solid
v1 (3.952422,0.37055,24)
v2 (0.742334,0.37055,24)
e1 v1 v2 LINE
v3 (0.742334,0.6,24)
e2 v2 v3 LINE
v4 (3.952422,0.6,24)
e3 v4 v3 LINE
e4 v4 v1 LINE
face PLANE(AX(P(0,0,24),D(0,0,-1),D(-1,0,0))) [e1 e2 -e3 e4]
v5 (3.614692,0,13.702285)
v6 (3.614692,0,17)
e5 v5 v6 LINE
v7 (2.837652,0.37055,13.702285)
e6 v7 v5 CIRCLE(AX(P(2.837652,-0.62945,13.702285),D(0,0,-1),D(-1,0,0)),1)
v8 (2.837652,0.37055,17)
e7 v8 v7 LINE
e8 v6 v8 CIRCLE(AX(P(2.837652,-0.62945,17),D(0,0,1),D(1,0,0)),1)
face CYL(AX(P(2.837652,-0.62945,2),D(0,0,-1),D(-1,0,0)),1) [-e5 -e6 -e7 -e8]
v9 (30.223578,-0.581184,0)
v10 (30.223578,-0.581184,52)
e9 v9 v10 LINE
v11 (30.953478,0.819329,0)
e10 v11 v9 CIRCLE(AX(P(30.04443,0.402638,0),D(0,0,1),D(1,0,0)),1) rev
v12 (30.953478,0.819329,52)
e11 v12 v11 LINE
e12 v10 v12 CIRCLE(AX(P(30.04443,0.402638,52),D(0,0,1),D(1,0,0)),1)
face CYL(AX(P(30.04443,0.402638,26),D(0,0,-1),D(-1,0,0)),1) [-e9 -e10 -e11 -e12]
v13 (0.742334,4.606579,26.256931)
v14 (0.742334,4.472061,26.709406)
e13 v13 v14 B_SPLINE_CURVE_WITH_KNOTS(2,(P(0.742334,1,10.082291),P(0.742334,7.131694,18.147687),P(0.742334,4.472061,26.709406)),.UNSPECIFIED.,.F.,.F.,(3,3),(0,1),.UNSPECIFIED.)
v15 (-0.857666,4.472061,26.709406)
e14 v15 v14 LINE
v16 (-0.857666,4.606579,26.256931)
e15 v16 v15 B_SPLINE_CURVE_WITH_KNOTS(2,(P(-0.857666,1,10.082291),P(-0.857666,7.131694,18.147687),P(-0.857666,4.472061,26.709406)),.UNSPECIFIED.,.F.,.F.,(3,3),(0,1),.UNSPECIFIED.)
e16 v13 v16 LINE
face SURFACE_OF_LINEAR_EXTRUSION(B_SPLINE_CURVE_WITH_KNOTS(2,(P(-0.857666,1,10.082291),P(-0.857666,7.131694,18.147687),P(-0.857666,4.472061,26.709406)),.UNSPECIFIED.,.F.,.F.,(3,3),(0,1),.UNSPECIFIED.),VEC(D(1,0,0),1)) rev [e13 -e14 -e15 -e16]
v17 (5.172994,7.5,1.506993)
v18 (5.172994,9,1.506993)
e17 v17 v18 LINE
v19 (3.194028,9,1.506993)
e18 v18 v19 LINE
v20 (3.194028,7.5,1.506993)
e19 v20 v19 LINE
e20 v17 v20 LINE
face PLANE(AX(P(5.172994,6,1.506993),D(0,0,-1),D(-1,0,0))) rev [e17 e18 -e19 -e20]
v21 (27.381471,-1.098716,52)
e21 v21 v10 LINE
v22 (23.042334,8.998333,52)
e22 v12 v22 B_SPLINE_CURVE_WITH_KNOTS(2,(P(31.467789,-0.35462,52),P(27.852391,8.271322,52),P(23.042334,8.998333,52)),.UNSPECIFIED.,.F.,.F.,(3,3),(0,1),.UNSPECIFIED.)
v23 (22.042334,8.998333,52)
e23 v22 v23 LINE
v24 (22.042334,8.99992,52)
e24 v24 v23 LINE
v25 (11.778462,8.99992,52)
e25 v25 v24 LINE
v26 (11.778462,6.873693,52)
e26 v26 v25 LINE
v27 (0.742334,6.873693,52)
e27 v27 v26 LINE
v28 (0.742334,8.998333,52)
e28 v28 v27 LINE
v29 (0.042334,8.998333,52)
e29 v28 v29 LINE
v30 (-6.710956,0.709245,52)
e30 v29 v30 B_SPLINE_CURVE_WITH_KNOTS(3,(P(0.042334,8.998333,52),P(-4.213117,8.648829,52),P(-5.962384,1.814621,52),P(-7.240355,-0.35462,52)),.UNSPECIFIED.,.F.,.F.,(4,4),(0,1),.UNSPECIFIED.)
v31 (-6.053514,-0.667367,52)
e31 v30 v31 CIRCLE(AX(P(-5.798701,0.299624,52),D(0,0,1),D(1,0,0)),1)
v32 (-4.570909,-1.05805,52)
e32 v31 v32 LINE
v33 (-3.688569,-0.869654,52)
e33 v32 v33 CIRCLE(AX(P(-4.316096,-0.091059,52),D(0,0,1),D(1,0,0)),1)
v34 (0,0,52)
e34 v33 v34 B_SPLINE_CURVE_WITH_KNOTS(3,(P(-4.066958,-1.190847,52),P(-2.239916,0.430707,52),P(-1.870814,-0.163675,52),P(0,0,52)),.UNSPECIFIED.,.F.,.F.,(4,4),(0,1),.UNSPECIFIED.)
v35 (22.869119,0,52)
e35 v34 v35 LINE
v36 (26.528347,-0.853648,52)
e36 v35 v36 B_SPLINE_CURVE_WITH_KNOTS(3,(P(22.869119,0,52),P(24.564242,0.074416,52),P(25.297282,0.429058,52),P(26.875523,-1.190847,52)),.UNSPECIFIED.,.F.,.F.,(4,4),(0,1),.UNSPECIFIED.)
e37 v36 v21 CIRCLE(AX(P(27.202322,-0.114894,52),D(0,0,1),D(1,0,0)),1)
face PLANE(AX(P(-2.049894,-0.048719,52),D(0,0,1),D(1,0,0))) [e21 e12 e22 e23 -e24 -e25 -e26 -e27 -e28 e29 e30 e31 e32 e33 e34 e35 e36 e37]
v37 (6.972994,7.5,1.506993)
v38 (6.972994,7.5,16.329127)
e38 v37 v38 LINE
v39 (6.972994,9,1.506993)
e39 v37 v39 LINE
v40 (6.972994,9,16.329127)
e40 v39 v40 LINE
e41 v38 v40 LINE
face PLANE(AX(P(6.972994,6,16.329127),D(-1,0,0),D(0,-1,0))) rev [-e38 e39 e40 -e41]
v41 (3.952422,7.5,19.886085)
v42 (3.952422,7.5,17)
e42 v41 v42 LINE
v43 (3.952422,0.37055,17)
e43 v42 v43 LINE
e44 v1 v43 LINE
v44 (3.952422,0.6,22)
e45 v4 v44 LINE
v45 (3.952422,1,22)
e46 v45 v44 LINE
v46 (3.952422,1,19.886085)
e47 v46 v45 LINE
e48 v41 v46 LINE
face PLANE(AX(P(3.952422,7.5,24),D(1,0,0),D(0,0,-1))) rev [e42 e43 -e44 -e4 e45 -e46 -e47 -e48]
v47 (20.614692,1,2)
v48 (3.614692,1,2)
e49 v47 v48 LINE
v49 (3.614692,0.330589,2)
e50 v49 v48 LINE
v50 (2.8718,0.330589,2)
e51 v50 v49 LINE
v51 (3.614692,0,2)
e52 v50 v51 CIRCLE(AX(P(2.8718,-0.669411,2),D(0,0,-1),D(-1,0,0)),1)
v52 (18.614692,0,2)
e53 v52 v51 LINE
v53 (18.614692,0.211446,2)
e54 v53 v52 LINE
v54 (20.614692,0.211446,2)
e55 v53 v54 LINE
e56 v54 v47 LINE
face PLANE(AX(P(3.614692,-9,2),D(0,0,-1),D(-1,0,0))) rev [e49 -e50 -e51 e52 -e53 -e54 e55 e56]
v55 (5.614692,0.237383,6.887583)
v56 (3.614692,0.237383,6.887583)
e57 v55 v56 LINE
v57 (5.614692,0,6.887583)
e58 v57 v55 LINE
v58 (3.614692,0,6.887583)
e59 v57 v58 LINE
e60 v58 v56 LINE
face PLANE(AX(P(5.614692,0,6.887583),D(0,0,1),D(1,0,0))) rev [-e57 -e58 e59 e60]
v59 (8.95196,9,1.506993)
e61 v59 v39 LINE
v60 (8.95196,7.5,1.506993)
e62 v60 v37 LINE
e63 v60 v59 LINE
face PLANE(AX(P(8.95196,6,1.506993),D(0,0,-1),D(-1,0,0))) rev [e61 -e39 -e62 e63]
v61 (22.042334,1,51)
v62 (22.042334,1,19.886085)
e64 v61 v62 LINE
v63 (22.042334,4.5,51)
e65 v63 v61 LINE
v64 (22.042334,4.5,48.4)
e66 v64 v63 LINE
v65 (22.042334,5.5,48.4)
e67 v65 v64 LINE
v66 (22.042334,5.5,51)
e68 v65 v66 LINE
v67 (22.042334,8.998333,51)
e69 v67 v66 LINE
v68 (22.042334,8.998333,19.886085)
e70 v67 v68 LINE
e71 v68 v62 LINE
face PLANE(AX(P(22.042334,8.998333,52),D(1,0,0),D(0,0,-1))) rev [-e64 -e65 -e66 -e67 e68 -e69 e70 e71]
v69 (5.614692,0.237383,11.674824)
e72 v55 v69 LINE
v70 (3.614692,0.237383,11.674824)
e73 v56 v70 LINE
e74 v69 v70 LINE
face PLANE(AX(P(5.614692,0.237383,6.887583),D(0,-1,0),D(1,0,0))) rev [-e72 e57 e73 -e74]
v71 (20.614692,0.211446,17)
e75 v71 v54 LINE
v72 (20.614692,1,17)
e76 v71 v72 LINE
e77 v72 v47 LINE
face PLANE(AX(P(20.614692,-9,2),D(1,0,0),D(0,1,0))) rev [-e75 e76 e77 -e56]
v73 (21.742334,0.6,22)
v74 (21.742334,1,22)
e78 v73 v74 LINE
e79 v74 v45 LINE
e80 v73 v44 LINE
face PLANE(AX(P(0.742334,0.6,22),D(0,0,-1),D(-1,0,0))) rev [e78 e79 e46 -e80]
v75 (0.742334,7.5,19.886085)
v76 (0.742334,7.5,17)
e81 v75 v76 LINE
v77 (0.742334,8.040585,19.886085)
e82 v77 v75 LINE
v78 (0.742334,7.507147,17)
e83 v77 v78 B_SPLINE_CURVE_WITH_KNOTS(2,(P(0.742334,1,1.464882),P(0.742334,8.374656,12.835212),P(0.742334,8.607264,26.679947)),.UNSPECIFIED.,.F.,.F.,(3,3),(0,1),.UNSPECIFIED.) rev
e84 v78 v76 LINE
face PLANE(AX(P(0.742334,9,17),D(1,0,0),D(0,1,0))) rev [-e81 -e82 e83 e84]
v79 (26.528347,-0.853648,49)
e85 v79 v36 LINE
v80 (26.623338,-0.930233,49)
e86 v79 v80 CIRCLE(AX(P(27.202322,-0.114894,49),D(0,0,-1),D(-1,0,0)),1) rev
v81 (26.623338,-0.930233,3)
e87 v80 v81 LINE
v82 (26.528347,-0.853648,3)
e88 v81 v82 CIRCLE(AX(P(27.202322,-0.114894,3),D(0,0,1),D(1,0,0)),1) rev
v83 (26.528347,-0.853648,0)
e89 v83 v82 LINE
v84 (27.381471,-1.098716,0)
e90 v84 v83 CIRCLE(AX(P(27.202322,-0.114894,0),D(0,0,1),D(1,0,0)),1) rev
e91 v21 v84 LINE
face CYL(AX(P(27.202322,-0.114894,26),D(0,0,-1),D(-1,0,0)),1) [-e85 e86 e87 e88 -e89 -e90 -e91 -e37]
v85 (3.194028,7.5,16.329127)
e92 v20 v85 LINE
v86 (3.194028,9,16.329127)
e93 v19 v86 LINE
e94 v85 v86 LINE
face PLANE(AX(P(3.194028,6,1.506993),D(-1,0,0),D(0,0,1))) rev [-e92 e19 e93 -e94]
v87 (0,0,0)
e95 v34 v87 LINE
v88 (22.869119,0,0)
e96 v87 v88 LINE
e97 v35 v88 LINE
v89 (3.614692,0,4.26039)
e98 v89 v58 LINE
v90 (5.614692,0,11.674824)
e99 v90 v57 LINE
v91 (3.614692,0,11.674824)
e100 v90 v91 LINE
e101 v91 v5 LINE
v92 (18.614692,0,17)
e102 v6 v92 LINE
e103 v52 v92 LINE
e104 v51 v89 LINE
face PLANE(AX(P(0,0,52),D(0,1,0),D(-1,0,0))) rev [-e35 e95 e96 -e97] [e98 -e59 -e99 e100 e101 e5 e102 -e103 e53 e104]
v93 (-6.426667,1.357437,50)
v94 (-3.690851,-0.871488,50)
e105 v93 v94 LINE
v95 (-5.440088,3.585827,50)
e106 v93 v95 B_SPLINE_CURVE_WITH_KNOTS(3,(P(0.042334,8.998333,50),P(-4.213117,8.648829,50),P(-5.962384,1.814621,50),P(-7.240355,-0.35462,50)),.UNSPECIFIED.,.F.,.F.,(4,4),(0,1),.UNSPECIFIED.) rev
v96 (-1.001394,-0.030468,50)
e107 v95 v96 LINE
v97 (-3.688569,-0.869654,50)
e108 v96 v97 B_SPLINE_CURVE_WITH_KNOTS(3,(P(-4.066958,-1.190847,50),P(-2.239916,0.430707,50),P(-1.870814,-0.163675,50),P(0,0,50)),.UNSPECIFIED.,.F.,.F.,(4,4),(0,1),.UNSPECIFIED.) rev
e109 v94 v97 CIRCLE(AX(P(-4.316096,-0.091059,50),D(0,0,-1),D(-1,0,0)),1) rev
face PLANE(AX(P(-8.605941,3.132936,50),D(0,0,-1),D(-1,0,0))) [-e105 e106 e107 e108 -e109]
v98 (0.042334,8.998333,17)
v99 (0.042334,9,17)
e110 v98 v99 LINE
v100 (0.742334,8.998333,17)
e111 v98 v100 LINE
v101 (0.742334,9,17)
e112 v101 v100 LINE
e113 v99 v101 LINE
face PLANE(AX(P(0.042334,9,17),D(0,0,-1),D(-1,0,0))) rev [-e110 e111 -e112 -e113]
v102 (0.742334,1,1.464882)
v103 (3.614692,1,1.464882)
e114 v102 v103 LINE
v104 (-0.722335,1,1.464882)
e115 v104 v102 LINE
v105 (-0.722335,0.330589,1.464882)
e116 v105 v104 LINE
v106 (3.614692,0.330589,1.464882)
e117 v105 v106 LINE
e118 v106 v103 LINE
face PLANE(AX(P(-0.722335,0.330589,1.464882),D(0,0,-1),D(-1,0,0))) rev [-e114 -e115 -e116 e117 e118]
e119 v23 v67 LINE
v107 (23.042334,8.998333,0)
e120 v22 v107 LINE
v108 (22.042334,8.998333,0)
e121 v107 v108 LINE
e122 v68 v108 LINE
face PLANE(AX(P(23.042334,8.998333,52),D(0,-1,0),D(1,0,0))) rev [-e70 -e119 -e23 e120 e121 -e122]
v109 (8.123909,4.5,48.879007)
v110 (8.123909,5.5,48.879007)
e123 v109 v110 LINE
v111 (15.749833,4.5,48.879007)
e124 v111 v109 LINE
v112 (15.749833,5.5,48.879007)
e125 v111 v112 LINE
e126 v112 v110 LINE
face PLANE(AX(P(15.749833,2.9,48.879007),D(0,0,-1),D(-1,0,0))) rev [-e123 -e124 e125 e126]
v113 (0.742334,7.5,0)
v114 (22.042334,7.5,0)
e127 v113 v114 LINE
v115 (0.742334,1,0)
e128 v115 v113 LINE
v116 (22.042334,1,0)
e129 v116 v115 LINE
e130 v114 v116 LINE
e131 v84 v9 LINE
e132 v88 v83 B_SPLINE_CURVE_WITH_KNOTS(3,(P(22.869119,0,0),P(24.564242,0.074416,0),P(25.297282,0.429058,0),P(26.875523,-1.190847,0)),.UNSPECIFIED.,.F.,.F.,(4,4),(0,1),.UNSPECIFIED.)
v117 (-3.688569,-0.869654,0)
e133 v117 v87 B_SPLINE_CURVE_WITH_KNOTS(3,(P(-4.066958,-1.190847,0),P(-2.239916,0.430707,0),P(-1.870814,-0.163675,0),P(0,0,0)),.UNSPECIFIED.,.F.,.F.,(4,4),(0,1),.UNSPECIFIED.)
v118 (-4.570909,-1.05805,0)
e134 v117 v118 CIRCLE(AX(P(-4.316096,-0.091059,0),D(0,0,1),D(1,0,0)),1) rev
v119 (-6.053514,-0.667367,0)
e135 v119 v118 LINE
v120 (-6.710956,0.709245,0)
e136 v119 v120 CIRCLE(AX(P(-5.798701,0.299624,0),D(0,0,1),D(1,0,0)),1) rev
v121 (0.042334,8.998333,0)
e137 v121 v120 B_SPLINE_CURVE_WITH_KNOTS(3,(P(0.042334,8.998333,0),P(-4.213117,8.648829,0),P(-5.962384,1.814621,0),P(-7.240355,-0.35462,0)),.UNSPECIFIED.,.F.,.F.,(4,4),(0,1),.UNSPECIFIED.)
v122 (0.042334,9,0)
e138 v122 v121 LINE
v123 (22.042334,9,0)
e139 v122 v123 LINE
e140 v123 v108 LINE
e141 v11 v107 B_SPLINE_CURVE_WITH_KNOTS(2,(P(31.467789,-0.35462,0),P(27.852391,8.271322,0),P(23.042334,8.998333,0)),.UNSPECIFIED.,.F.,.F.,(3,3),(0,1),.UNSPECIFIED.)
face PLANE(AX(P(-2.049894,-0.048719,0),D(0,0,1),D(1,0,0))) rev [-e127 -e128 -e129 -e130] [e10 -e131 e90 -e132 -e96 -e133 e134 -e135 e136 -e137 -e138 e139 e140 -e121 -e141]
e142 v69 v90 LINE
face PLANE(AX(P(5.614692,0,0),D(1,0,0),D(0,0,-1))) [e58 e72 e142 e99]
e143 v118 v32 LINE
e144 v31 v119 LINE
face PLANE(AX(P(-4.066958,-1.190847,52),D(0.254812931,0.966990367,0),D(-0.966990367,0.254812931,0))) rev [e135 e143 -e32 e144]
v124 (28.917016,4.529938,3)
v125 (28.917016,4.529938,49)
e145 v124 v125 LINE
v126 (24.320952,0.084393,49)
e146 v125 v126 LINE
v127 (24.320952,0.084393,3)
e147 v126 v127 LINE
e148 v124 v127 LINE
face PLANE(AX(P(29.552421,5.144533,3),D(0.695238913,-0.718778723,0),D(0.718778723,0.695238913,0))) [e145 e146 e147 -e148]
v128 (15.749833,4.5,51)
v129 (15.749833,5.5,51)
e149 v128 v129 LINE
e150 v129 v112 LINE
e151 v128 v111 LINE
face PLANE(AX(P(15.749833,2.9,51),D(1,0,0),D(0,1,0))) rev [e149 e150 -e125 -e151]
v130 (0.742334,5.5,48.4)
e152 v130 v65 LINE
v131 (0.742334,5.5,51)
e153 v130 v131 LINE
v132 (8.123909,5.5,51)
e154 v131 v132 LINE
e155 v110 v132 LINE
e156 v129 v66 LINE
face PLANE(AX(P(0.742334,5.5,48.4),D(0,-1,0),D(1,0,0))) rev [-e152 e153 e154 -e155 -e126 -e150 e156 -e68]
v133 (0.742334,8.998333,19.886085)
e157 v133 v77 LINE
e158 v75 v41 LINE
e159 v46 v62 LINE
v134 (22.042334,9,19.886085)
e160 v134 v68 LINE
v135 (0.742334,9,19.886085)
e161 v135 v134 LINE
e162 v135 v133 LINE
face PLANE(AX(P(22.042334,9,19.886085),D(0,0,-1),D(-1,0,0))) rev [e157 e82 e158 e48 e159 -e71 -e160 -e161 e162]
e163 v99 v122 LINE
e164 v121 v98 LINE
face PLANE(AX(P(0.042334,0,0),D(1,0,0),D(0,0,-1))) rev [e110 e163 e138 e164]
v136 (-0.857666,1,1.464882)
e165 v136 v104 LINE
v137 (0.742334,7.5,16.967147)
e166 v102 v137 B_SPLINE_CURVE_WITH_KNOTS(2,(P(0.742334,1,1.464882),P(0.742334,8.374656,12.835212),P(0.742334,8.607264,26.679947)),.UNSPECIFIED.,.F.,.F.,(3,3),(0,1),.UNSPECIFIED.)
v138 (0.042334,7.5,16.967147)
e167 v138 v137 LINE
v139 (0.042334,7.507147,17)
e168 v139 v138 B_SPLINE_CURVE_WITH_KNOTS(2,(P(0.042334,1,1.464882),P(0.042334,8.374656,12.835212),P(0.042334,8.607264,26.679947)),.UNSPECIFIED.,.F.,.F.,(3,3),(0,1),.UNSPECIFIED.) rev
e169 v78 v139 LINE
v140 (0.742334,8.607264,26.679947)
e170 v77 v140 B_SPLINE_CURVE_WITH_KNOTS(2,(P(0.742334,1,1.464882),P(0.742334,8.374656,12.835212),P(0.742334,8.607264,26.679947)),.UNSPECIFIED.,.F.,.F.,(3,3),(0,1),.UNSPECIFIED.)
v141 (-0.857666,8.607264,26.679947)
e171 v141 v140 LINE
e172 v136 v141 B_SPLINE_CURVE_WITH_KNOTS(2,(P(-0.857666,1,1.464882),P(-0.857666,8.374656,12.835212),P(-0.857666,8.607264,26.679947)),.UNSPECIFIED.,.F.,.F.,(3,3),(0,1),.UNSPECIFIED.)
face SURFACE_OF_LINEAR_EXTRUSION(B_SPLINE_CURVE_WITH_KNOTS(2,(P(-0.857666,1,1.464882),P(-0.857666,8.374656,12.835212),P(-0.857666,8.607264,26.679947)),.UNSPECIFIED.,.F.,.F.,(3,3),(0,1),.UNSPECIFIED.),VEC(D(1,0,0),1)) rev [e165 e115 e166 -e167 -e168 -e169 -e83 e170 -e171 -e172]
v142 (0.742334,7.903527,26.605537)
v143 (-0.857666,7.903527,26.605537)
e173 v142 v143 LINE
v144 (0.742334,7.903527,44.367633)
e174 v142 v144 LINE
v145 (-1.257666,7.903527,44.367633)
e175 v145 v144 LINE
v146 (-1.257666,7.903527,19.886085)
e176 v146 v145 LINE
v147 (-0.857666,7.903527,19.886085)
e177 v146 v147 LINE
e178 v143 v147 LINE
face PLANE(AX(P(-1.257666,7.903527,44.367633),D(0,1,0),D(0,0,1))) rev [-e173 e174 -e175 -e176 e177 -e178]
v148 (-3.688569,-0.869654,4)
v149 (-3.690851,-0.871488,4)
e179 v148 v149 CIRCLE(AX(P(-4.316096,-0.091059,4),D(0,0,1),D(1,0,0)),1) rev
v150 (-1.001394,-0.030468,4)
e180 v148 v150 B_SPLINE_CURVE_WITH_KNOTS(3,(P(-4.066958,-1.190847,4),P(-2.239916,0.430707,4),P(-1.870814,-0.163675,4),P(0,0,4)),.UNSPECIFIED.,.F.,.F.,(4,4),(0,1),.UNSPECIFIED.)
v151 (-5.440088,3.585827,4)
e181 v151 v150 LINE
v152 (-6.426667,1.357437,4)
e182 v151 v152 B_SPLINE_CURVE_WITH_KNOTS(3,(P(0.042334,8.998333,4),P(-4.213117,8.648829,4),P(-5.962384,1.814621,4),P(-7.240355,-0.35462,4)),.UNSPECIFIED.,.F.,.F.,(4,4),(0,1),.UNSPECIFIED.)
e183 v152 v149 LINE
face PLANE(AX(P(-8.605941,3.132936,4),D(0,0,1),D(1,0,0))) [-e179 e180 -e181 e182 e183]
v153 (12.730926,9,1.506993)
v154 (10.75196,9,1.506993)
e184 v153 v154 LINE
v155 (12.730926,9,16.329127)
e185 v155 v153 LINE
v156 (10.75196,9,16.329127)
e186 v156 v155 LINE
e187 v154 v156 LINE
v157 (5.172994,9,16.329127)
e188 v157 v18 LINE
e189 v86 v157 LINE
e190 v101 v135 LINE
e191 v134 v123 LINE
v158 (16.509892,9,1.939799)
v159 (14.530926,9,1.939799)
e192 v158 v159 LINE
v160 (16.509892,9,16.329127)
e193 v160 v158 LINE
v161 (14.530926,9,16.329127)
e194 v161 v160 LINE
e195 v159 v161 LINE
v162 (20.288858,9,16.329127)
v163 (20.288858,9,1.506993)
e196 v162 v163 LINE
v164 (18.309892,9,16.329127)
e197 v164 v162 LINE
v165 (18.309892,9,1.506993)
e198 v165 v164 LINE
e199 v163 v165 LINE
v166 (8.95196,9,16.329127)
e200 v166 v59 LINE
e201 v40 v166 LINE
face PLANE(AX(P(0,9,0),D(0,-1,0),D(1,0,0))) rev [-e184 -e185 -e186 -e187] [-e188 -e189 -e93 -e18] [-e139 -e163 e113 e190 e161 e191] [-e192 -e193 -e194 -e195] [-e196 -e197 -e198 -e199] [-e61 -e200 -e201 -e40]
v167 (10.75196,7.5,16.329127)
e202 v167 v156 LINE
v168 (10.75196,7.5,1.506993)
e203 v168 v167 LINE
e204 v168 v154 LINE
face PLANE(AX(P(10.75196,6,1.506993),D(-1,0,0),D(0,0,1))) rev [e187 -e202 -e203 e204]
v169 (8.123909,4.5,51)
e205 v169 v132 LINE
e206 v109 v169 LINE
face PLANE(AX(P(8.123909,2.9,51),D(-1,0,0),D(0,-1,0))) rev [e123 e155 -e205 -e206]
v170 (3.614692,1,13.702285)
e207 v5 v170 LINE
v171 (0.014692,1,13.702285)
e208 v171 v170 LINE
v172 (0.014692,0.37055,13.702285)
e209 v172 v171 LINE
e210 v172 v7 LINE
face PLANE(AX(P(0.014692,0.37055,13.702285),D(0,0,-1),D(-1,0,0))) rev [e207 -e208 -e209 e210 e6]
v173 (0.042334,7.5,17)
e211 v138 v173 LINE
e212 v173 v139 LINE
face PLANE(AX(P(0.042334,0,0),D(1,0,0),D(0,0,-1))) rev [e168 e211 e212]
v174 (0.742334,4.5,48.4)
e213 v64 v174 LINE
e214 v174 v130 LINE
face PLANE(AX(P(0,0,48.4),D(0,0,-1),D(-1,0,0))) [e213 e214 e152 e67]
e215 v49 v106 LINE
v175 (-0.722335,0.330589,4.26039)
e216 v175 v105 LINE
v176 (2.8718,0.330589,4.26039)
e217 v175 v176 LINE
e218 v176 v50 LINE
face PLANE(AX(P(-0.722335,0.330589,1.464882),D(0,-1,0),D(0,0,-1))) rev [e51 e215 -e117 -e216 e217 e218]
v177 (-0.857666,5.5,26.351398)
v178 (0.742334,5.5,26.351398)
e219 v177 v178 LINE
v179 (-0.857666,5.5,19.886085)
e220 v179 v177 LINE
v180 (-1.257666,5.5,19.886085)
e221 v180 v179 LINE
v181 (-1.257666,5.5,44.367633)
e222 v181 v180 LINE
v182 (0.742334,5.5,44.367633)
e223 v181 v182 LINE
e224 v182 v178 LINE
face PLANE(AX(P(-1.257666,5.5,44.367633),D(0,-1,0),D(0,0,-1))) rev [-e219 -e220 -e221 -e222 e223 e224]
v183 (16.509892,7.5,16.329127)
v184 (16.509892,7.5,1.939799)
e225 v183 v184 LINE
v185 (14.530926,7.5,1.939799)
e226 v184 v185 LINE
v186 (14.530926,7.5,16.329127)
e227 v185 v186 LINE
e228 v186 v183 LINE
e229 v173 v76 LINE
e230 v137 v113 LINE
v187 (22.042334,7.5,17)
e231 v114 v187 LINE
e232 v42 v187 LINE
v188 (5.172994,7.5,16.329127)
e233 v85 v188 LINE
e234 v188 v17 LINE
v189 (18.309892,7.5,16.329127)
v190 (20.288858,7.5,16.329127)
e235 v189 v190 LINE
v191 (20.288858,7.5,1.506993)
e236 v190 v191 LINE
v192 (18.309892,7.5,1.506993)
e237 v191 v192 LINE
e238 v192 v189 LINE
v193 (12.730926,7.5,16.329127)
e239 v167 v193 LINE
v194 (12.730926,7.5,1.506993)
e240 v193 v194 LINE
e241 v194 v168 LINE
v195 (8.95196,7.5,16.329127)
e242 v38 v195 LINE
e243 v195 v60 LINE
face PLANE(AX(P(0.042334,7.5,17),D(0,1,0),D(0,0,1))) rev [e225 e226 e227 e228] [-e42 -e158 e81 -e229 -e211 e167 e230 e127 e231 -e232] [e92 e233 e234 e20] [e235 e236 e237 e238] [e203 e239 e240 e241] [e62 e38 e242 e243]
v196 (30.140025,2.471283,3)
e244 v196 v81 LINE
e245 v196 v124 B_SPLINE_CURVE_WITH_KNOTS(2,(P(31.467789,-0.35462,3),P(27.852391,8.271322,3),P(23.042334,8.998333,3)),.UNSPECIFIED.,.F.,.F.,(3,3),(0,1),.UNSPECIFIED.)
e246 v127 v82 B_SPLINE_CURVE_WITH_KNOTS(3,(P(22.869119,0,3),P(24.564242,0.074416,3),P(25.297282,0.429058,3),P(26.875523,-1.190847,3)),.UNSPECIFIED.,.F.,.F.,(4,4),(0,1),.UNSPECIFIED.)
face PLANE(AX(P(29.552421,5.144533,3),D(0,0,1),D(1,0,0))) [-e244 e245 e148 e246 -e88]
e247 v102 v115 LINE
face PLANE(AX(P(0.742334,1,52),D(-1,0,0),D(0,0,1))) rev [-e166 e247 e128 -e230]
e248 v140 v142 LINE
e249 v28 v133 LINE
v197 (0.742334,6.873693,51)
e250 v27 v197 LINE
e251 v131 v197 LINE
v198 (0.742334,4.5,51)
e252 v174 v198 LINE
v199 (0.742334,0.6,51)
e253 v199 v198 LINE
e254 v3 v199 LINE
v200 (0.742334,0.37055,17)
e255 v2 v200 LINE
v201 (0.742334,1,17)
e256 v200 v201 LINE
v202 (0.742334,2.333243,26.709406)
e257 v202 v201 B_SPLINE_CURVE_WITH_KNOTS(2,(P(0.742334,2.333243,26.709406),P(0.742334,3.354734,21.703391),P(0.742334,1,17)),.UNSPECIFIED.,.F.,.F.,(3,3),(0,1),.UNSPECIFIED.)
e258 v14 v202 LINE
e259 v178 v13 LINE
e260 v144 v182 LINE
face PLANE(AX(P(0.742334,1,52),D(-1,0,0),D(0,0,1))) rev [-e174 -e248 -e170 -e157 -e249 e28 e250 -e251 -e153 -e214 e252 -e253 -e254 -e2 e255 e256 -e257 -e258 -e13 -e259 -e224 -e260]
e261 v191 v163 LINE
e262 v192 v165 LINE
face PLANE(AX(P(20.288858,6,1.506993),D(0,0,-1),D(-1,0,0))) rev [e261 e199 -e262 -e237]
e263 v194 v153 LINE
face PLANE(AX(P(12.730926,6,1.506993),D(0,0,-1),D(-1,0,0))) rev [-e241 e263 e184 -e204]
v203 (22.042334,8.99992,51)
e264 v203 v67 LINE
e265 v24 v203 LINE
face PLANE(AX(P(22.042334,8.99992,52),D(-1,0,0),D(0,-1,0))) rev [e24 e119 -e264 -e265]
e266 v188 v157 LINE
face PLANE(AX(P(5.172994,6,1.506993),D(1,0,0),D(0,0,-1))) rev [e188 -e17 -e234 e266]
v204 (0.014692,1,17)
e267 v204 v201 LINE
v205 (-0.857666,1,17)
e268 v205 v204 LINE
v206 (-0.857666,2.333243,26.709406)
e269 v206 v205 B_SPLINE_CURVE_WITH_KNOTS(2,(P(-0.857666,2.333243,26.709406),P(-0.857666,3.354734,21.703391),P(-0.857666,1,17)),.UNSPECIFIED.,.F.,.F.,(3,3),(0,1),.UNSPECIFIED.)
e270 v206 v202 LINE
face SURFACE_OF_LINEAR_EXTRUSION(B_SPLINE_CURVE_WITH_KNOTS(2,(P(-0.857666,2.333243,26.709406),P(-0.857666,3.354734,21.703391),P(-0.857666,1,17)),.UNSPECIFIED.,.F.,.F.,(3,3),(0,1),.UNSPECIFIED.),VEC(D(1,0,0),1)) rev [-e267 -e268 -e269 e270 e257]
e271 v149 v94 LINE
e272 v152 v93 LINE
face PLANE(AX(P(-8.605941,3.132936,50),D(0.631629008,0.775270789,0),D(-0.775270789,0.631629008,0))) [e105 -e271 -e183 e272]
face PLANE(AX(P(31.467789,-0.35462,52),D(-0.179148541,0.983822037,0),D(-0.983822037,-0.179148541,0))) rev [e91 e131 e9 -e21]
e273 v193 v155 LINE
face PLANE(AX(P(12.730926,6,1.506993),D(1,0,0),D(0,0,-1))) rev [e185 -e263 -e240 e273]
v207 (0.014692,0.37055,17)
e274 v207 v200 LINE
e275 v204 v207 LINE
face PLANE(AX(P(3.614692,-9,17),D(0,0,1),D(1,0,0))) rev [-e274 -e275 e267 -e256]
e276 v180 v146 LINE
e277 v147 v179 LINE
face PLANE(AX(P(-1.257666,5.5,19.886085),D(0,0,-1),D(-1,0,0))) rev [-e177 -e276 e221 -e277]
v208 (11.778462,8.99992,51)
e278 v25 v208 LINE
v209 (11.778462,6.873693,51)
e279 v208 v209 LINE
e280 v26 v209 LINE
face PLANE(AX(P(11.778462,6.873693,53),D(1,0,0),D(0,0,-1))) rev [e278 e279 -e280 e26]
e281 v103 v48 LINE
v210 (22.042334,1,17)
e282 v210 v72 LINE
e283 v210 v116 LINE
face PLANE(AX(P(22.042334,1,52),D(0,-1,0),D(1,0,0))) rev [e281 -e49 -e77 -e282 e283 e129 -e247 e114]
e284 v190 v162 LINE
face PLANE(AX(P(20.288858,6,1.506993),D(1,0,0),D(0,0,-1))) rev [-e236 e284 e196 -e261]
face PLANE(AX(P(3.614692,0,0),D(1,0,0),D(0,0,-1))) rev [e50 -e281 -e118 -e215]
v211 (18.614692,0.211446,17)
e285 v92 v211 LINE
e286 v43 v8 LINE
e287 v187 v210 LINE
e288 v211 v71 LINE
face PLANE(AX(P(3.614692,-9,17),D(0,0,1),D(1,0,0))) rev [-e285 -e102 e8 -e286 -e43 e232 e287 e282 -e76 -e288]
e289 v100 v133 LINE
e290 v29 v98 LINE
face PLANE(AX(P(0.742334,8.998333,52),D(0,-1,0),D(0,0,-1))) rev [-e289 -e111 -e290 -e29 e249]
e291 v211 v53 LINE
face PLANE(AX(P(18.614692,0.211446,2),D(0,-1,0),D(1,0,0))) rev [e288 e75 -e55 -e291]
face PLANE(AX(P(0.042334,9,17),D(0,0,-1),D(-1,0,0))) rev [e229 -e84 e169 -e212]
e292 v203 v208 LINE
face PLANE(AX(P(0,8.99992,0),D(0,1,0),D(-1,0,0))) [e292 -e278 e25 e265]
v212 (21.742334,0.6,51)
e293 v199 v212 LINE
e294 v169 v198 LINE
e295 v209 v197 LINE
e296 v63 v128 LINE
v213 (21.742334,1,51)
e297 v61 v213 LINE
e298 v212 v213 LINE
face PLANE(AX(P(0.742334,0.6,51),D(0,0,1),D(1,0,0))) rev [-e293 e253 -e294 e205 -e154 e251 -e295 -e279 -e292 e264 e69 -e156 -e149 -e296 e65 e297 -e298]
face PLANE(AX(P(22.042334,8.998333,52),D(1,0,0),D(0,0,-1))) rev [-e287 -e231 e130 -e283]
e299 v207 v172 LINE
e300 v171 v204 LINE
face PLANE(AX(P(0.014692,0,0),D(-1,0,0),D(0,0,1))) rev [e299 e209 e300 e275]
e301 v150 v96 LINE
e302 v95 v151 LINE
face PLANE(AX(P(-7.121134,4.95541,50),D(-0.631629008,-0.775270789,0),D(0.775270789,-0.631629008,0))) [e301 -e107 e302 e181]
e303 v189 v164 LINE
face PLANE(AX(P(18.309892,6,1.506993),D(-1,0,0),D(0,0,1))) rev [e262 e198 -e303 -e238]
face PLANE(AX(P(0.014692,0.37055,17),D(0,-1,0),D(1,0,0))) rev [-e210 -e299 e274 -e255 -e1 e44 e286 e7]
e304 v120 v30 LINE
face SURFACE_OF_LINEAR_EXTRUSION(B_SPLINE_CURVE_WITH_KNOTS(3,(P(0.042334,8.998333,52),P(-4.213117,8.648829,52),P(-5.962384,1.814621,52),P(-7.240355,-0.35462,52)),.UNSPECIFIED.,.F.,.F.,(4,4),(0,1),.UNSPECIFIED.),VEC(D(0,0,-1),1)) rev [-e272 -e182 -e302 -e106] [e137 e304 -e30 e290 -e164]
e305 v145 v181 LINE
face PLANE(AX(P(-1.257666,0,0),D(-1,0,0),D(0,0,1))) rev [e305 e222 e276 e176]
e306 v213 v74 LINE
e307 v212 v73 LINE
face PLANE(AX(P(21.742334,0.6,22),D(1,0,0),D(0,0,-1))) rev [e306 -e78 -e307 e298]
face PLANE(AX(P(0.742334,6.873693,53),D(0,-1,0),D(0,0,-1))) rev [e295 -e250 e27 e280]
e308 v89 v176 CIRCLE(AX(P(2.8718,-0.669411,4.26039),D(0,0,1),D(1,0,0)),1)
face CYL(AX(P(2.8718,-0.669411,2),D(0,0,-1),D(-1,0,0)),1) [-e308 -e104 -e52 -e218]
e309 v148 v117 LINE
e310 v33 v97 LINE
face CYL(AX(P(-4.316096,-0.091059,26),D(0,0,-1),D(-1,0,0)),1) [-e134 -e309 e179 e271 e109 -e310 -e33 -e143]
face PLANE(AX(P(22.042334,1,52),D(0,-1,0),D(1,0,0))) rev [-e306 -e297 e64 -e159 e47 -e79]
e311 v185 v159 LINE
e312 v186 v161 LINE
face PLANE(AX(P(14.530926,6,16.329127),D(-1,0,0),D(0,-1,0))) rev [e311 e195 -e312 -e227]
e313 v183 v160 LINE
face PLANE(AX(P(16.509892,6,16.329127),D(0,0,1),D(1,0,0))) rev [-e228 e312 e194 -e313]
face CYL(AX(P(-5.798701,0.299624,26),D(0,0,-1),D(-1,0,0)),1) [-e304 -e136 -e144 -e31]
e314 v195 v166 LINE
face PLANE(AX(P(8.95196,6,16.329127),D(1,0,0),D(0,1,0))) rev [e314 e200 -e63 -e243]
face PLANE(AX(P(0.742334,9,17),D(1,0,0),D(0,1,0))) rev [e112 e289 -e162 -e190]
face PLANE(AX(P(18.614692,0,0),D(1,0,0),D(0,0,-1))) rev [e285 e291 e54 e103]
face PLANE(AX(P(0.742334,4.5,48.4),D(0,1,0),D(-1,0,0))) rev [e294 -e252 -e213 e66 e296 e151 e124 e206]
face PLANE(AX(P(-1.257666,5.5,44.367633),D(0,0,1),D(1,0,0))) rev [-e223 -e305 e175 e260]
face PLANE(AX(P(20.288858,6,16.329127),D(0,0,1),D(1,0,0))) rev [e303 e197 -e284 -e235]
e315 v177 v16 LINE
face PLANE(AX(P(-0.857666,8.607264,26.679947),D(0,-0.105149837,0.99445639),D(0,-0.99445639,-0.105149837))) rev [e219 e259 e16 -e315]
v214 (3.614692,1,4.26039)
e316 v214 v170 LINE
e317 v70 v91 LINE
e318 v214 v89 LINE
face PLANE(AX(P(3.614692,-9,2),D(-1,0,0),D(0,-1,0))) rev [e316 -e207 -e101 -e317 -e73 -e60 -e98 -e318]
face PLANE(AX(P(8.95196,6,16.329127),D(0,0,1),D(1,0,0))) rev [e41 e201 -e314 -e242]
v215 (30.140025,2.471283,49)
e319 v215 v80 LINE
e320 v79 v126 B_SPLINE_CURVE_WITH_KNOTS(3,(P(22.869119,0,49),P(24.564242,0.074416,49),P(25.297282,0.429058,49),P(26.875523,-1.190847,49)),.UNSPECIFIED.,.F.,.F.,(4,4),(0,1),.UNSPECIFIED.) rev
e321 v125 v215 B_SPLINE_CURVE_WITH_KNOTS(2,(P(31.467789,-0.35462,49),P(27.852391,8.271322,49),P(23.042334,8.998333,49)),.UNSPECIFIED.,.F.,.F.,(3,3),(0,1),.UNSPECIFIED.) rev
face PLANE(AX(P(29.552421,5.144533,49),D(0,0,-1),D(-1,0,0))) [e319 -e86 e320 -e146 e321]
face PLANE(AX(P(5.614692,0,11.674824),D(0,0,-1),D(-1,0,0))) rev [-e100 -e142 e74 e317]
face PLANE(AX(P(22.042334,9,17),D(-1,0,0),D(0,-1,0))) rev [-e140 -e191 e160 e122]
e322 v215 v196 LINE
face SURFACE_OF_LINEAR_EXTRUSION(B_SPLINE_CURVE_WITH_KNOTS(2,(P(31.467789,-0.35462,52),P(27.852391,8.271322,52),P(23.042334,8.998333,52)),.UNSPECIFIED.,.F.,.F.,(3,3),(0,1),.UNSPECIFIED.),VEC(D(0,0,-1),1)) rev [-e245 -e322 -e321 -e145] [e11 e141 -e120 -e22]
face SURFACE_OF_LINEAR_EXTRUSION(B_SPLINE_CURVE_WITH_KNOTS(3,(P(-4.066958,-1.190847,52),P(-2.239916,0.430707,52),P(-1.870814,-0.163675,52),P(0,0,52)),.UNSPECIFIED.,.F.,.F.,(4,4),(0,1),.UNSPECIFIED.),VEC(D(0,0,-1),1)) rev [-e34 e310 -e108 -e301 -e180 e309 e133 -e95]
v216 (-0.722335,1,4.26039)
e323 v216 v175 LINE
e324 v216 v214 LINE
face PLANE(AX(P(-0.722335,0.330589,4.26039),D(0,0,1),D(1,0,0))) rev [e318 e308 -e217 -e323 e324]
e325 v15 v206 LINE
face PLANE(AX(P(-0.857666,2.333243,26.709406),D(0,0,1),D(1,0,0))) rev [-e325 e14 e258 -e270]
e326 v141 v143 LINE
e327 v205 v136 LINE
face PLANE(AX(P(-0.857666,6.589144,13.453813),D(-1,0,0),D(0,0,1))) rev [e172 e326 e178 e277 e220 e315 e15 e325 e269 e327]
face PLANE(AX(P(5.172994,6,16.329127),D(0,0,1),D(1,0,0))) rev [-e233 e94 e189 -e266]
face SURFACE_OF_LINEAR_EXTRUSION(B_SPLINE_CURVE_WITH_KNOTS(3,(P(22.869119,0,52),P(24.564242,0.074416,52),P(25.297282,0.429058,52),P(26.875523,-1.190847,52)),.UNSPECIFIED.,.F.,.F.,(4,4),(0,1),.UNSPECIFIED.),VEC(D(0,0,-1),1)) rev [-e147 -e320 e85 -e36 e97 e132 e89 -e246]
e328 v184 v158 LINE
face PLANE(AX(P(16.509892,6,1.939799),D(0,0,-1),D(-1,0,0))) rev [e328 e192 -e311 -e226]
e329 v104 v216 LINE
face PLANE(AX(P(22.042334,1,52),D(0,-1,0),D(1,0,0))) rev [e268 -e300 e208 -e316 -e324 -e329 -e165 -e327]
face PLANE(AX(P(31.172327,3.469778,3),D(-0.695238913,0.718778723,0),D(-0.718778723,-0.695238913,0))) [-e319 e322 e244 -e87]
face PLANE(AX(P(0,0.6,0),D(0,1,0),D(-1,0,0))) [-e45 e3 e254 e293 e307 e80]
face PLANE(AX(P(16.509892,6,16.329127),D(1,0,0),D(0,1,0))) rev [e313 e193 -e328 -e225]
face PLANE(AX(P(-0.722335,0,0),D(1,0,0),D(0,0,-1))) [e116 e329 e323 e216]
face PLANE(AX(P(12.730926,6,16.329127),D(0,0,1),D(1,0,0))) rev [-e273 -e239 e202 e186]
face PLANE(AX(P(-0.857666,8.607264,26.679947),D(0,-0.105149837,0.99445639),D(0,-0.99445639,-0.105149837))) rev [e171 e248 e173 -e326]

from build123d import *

# Parameters (mm, degrees)
BOSS_EXTRUDE2_DEPTH      = 52
FILLET2_R                = 1
CUT_EXTRUDE2_DEPTH       = 3
CUT_EXTRUDE2_DEPTH_BACK  = 6
SKETCH10_W               = 2.350757351
SKETCH10_H               = 46
SKETCH11_W               = 17
SKETCH11_H               = 15
PELTIER_DEPTH            = 10
SKETCH12_W               = 21
SKETCH12_H               = 29
BATTERY_DEPTH            = 0.4
SKETCH14_W               = 21.3
SKETCH14_H               = 1
BOSS_EXTRUDE4_DEPTH      = 7.999920354
SKETCH15_W               = 3.297714658
SKETCH15_H               = 0.629450307
CUT_EXTRUDE5_DEPTH       = 3.6
SKETCH16_W               = 2.795507754
SKETCH16_H               = 0.669410668
CUT_EXTRUDE6_DEPTH       = 4.337027413
FILLET3_R                = 1
CUT_EXTRUDE7_DEPTH       = 1.6
CUT_EXTRUDE8_DEPTH       = 1.6
FILLET4_R                = 1
FILLET5_R                = 1
SKETCH19_W               = 21.3
SKETCH19_H               = 1
BOSS_EXTRUDE5_DEPTH      = 2.6
SKETCH20_W               = 7.625924169
SKETCH20_H               = 2.120993271
CUT_EXTRUDE9_DEPTH       = 2.6
SKETCH21_W               = 21.3
SKETCH21_H               = 2.886084762
BOSS_EXTRUDE6_DEPTH      = 8
SKETCH22_W               = 17
SKETCH22_H               = 1.5
BOSS_EXTRUDE7_DEPTH      = 22
SKETCH23_W               = 24.481547991
SKETCH23_H               = 2.403526745
CUT_EXTRUDE10_DEPTH      = 2
SKETCH24_W               = 15
SKETCH24_H               = 0.211445756
BOSS_EXTRUDE8_DEPTH      = 2
SKETCH25_W               = 4.787241237
SKETCH25_H               = 0.237383131
BOSS_EXTRUDE9_DEPTH      = 2
SKETCH26_W               = 11.036128308
SKETCH26_H               = 2.126226966
CUT_EXTRUDE11_DEPTH      = 2
CUT_EXTRUDE12_DEPTH      = 2
CUT_EXTRUDE12_DEPTH_BACK = 11
SKETCH27_W               = 46
SKETCH27_H               = 2.33
SKETCH28_W               = 1.978966
SKETCH28_H               = 14.822133623
SKETCH28_H_2             = 14.389327905
SKETCH28_W_2             = 1.978965999
CUT_EXTRUDE13_DEPTH      = 3
SKETCH29_W               = 3.210088646
SKETCH29_H               = 7.129450307
CUT_EXTRUDE14_DEPTH      = 7


with BuildPart() as part:
    # Sketch1 → Boss-Extrude2 (new body)
    with BuildSketch(Plane.XY):
        with BuildLine():
            Line((-4.066957942, -1.190846618), (-7.240355005, -0.354620493))
            add(Edge.make_bspline(
                [(0.042333709, 8.998333002), (-4.213116867, 8.648828695), (-5.962383558, 1.81462105), (-7.240355005, -0.354620493)],
                knots=[0, 0, 0, 0, 1, 1, 1, 1], degree=3))
            Line((0.042333709, 8.998333002), (0.742333709, 8.998333002))
            Line((0.742333709, 8.998333002), (0.742333709, 1))
            Line((0.742333709, 1), (22.042333709, 1))
            Line((22.042333709, 1), (22.042333709, 8.998333002))
            Line((22.042333709, 8.998333002), (23.042333709, 8.998333002))
            add(Edge.make_bspline(
                [(23.042333709, 8.998333002), (27.852391375, 8.27132168), (31.467788923, -0.354620493)],
                knots=[0, 0, 0, 1, 1, 1], degree=2))
            Line((31.467788923, -0.354620493), (26.875523276, -1.190846618))
            add(Edge.make_bspline(
                [(22.86911945, 0), (24.564241842, 0.074416087), (25.297281614, 0.429058332), (26.875523276, -1.190846618)],
                knots=[0, 0, 0, 0, 1, 1, 1, 1], degree=3))
            Line((22.86911945, 0), (0, 0))
            add(Edge.make_bspline(
                [(0, 0), (-1.870814346, -0.163675047), (-2.239916233, 0.430706612), (-4.066957942, -1.190846618)],
                knots=[0, 0, 0, 0, 1, 1, 1, 1], degree=3))
        make_face()
    extrude(amount=BOSS_EXTRUDE2_DEPTH)

    # Fillet2
    fillet2_edges = [part.edges().sort_by_distance(p)[0] for p in [
        (-4.066957942, -1.190846618, 26),
        (-7.240355005, -0.354620493, 26),
    ]]
    fillet(fillet2_edges, radius=FILLET2_R)

    # Sketch10 → Cut-Extrude2 (cut, two sides: drawn at the far end of the back side and taken through both)
    with BuildSketch(Plane(origin=(-4.380890916, 3.569201652, 0), x_dir=(0.631629007569502, 0.7752707893354205, 0), z_dir=(-0.7752707893354205, 0.631629007569502, 0)).offset(-CUT_EXTRUDE2_DEPTH_BACK)):
        with Locations((-1.831509184, -27)):
            Rectangle(SKETCH10_W, SKETCH10_H)
    extrude(amount=CUT_EXTRUDE2_DEPTH + CUT_EXTRUDE2_DEPTH_BACK, mode=Mode.SUBTRACT)

    # Sketch11 → Peltier (cut)
    with BuildSketch(Plane(origin=(0, 1, 0), x_dir=(1, 0, 0), z_dir=(0, 1, 0))):
        with Locations((12.114692368, -9.5)):
            Rectangle(SKETCH11_W, SKETCH11_H)
    extrude(amount=-PELTIER_DEPTH, mode=Mode.SUBTRACT)

    # Sketch12 → Battery (cut)
    with BuildSketch(Plane(origin=(0, 1, 0), x_dir=(1, 0, 0), z_dir=(0, 1, 0))):
        with Locations((11.242333709, -36.5)):
            Rectangle(SKETCH12_W, SKETCH12_H)
    extrude(amount=-BATTERY_DEPTH, mode=Mode.SUBTRACT)

    # Sketch14 → Boss-Extrude4 (add)
    with BuildSketch(Plane(origin=(0, 1, 0), x_dir=(1, 0, 0), z_dir=(0, 1, 0))):
        with Locations((11.392333709, -51.5)):
            Rectangle(SKETCH14_W, SKETCH14_H)
    extrude(amount=BOSS_EXTRUDE4_DEPTH)

    # Sketch15 → Cut-Extrude5 (cut)
    with BuildSketch(Plane(origin=(3.614692368, 0, 0), x_dir=(0, 0, -1), z_dir=(1, 0, 0))):
        with Locations((-15.351142671, 0.685274847)):
            Rectangle(SKETCH15_W, SKETCH15_H)
    extrude(amount=-CUT_EXTRUDE5_DEPTH, mode=Mode.SUBTRACT)

    # Sketch16 → Cut-Extrude6 (cut)
    with BuildSketch(Plane(origin=(3.614692368, 0, 0), x_dir=(0, 0, -1), z_dir=(1, 0, 0))):
        with Locations((-2.862635658, 0.665294666)):
            Rectangle(SKETCH16_W, SKETCH16_H)
    extrude(amount=-CUT_EXTRUDE6_DEPTH, mode=Mode.SUBTRACT)

    # Fillet3
    # the kernel refuses this fillet: 1 mm, written as the material it takes off along each edge
    with BuildSketch(Plane(origin=(3.614692368, 0.330589332, 2), x_dir=(0, -1, 0), z_dir=(0, 0, 1))) as fillet3_piece_1:
        with BuildLine():
            CenterArc((1, -0.742892561), FILLET3_R, 132.021596152, 47.978403848)
            Line((0, -0.742892561), (0, 0))
            Line((0, 0), (0.330589332, 0))
        make_face()
    extrude(amount=2.260389535, mode=Mode.SUBTRACT)
    with BuildSketch(Plane(origin=(3.614692368, 0.370549693, 17), x_dir=(0, -1, 0), z_dir=(0, 0, -1))) as fillet3_piece_2:
        with BuildLine():
            CenterArc((1, 0.77704074), FILLET3_R, 180, 50.990421184)
            Line((0, 0.77704074), (0, 0))
            Line((0, 0), (0.370549693, 0))
        make_face()
    extrude(amount=3.297714658, mode=Mode.SUBTRACT)

    # Sketch17 → Cut-Extrude7 (cut)
    with BuildSketch(Plane(origin=(0.742333709, 0, 0), x_dir=(0, 0, -1), z_dir=(1, 0, 0))):
        with BuildLine():
            Line((-26.679947222, 8.607264172), (-26.2562675, 4.600305927))
            add(Edge.make_bspline(
                [(-11.956359989, 1), (-18.174048642, 5.645894808), (-26.2562675, 4.600305927)],
                knots=[0, 0, 0, 1, 1, 1], degree=2))
            Line((-11.956359989, 1), (-1.464881781, 1))
            add(Edge.make_bspline(
                [(-1.464881781, 1), (-12.835212302, 8.374655541), (-26.679947222, 8.607264172)],
                knots=[0, 0, 0, 1, 1, 1], degree=2))
        make_face()
    extrude(amount=-CUT_EXTRUDE7_DEPTH, mode=Mode.SUBTRACT)

    # Sketch18 → Cut-Extrude8 (cut)
    with BuildSketch(Plane(origin=(0.742333709, 0, 0), x_dir=(0, 0, -1), z_dir=(1, 0, 0))):
        with BuildLine():
            Line((-26.709406335, 2.333242891), (-26.709406335, 4.472060633))
            add(Edge.make_bspline(
                [(-10.082290903, 1), (-18.147687182, 7.131693783), (-26.709406335, 4.472060633)],
                knots=[0, 0, 0, 1, 1, 1], degree=2))
            Line((-10.082290903, 1), (-17, 1))
            add(Edge.make_bspline(
                [(-17, 1), (-21.703390607, 3.354733642), (-26.709406335, 2.333242891)],
                knots=[0, 0, 0, 1, 1, 1], degree=2))
        make_face()
    extrude(amount=-CUT_EXTRUDE8_DEPTH, mode=Mode.SUBTRACT)

    # Fillet4
    fillet4_edges = [part.edges().sort_by_distance(p)[0] for p in [
        (26.875523276, -1.190846618, 26),
    ]]
    fillet(fillet4_edges, radius=FILLET4_R)

    # Fillet5
    fillet5_edges = [part.edges().sort_by_distance(p)[0] for p in [
        (31.467788923, -0.354620493, 26),
    ]]
    fillet(fillet5_edges, radius=FILLET5_R)

    # Sketch19 → Boss-Extrude5 (add)
    with BuildSketch(Plane(origin=(0, 0, 51), x_dir=(-1, 0, 0), z_dir=(0, 0, -1))):
        with Locations((-11.392333709, 5)):
            Rectangle(SKETCH19_W, SKETCH19_H)
    extrude(amount=BOSS_EXTRUDE5_DEPTH)

    # Sketch20 → Cut-Extrude9 (cut)
    with BuildSketch(Plane(origin=(0, 5.5, 0), x_dir=(1, 0, 0), z_dir=(0, 1, 0))):
        with Locations((11.936871332, -49.939503364)):
            Rectangle(SKETCH20_W, SKETCH20_H)
    extrude(amount=-CUT_EXTRUDE9_DEPTH, mode=Mode.SUBTRACT)

    # Sketch21 → Boss-Extrude6 (add)
    with BuildSketch(Plane(origin=(0, 1, 0), x_dir=(1, 0, 0), z_dir=(0, 1, 0))):
        with Locations((11.392333709, -18.443042381)):
            Rectangle(SKETCH21_W, SKETCH21_H)
    extrude(amount=BOSS_EXTRUDE6_DEPTH)

    # Sketch22 → Boss-Extrude7 (add)
    with BuildSketch(Plane.ZY.offset(-22.042333709)):
        with Locations((8.5, 8.25)):
            Rectangle(SKETCH22_W, SKETCH22_H)
    extrude(amount=BOSS_EXTRUDE7_DEPTH)

    # Sketch23 → Cut-Extrude10 (cut)
    with BuildSketch(Plane(origin=(0.742333709, 0, 0), x_dir=(0, 0, -1), z_dir=(1, 0, 0))):
        with Locations((-32.126858758, 6.701763373)):
            Rectangle(SKETCH23_W, SKETCH23_H)
    extrude(amount=-CUT_EXTRUDE10_DEPTH, mode=Mode.SUBTRACT)

    # Sketch24 → Boss-Extrude8 (add)
    with BuildSketch(Plane.ZY.offset(-20.614692368)):
        with Locations((9.5, 0.105722878)):
            Rectangle(SKETCH24_W, SKETCH24_H)
    extrude(amount=BOSS_EXTRUDE8_DEPTH)

    # Sketch25 → Boss-Extrude9 (add)
    with BuildSketch(Plane(origin=(3.614692368, 0, 0), x_dir=(0, 0, -1), z_dir=(1, 0, 0))):
        with Locations((-9.281203123, 0.118691566)):
            Rectangle(SKETCH25_W, SKETCH25_H)
    extrude(amount=BOSS_EXTRUDE9_DEPTH)

    # Sketch26 → Cut-Extrude11 (cut)
    with BuildSketch(Plane(origin=(0, 0, 51), x_dir=(-1, 0, 0), z_dir=(0, 0, -1))):
        with Locations((-6.260397863, 7.936806871)):
            Rectangle(SKETCH26_W, SKETCH26_H)
    extrude(amount=-CUT_EXTRUDE11_DEPTH, mode=Mode.SUBTRACT)

    # Sketch27 → Cut-Extrude12 (cut, two sides: drawn at the far end of the back side and taken through both)
    with BuildSketch(Plane(origin=(16.401330443, 15.864191281, 0), x_dir=(0, 0, -1), z_dir=(0.7187787233935905, 0.6952389134654938, 0)).offset(-CUT_EXTRUDE12_DEPTH_BACK)):
        with Locations((-26, -18.013212029)):
            Rectangle(SKETCH27_W, SKETCH27_H)
    extrude(amount=CUT_EXTRUDE12_DEPTH + CUT_EXTRUDE12_DEPTH_BACK, mode=Mode.SUBTRACT)

    # Sketch28 → Cut-Extrude13 (cut)
    with BuildSketch(Plane(origin=(0, 9, 0), x_dir=(1, 0, 0), z_dir=(0, 1, 0))):
        with Locations((19.299375066, -8.918059871)):
            Rectangle(SKETCH28_W, SKETCH28_H)
        with Locations((15.520409066, -9.13446273)):
            Rectangle(SKETCH28_W, SKETCH28_H_2)
        with Locations((11.741443067, -8.918059871)):
            Rectangle(SKETCH28_W_2, SKETCH28_H)
        with Locations((7.962477067, -8.918059871)):
            Rectangle(SKETCH28_W, SKETCH28_H)
        with Locations((4.183511067, -8.918059871)):
            Rectangle(SKETCH28_W, SKETCH28_H)
    extrude(amount=-CUT_EXTRUDE13_DEPTH, mode=Mode.SUBTRACT)

    # Sketch29 → Cut-Extrude14 (cut)
    with BuildSketch(Plane(origin=(0, 0, 17), x_dir=(-1, 0, 0), z_dir=(0, 0, -1))):
        with Locations((-2.347378032, 3.935274847)):
            Rectangle(SKETCH29_W, SKETCH29_H)
    extrude(amount=-CUT_EXTRUDE14_DEPTH, mode=Mode.SUBTRACT)


solid = part.part
